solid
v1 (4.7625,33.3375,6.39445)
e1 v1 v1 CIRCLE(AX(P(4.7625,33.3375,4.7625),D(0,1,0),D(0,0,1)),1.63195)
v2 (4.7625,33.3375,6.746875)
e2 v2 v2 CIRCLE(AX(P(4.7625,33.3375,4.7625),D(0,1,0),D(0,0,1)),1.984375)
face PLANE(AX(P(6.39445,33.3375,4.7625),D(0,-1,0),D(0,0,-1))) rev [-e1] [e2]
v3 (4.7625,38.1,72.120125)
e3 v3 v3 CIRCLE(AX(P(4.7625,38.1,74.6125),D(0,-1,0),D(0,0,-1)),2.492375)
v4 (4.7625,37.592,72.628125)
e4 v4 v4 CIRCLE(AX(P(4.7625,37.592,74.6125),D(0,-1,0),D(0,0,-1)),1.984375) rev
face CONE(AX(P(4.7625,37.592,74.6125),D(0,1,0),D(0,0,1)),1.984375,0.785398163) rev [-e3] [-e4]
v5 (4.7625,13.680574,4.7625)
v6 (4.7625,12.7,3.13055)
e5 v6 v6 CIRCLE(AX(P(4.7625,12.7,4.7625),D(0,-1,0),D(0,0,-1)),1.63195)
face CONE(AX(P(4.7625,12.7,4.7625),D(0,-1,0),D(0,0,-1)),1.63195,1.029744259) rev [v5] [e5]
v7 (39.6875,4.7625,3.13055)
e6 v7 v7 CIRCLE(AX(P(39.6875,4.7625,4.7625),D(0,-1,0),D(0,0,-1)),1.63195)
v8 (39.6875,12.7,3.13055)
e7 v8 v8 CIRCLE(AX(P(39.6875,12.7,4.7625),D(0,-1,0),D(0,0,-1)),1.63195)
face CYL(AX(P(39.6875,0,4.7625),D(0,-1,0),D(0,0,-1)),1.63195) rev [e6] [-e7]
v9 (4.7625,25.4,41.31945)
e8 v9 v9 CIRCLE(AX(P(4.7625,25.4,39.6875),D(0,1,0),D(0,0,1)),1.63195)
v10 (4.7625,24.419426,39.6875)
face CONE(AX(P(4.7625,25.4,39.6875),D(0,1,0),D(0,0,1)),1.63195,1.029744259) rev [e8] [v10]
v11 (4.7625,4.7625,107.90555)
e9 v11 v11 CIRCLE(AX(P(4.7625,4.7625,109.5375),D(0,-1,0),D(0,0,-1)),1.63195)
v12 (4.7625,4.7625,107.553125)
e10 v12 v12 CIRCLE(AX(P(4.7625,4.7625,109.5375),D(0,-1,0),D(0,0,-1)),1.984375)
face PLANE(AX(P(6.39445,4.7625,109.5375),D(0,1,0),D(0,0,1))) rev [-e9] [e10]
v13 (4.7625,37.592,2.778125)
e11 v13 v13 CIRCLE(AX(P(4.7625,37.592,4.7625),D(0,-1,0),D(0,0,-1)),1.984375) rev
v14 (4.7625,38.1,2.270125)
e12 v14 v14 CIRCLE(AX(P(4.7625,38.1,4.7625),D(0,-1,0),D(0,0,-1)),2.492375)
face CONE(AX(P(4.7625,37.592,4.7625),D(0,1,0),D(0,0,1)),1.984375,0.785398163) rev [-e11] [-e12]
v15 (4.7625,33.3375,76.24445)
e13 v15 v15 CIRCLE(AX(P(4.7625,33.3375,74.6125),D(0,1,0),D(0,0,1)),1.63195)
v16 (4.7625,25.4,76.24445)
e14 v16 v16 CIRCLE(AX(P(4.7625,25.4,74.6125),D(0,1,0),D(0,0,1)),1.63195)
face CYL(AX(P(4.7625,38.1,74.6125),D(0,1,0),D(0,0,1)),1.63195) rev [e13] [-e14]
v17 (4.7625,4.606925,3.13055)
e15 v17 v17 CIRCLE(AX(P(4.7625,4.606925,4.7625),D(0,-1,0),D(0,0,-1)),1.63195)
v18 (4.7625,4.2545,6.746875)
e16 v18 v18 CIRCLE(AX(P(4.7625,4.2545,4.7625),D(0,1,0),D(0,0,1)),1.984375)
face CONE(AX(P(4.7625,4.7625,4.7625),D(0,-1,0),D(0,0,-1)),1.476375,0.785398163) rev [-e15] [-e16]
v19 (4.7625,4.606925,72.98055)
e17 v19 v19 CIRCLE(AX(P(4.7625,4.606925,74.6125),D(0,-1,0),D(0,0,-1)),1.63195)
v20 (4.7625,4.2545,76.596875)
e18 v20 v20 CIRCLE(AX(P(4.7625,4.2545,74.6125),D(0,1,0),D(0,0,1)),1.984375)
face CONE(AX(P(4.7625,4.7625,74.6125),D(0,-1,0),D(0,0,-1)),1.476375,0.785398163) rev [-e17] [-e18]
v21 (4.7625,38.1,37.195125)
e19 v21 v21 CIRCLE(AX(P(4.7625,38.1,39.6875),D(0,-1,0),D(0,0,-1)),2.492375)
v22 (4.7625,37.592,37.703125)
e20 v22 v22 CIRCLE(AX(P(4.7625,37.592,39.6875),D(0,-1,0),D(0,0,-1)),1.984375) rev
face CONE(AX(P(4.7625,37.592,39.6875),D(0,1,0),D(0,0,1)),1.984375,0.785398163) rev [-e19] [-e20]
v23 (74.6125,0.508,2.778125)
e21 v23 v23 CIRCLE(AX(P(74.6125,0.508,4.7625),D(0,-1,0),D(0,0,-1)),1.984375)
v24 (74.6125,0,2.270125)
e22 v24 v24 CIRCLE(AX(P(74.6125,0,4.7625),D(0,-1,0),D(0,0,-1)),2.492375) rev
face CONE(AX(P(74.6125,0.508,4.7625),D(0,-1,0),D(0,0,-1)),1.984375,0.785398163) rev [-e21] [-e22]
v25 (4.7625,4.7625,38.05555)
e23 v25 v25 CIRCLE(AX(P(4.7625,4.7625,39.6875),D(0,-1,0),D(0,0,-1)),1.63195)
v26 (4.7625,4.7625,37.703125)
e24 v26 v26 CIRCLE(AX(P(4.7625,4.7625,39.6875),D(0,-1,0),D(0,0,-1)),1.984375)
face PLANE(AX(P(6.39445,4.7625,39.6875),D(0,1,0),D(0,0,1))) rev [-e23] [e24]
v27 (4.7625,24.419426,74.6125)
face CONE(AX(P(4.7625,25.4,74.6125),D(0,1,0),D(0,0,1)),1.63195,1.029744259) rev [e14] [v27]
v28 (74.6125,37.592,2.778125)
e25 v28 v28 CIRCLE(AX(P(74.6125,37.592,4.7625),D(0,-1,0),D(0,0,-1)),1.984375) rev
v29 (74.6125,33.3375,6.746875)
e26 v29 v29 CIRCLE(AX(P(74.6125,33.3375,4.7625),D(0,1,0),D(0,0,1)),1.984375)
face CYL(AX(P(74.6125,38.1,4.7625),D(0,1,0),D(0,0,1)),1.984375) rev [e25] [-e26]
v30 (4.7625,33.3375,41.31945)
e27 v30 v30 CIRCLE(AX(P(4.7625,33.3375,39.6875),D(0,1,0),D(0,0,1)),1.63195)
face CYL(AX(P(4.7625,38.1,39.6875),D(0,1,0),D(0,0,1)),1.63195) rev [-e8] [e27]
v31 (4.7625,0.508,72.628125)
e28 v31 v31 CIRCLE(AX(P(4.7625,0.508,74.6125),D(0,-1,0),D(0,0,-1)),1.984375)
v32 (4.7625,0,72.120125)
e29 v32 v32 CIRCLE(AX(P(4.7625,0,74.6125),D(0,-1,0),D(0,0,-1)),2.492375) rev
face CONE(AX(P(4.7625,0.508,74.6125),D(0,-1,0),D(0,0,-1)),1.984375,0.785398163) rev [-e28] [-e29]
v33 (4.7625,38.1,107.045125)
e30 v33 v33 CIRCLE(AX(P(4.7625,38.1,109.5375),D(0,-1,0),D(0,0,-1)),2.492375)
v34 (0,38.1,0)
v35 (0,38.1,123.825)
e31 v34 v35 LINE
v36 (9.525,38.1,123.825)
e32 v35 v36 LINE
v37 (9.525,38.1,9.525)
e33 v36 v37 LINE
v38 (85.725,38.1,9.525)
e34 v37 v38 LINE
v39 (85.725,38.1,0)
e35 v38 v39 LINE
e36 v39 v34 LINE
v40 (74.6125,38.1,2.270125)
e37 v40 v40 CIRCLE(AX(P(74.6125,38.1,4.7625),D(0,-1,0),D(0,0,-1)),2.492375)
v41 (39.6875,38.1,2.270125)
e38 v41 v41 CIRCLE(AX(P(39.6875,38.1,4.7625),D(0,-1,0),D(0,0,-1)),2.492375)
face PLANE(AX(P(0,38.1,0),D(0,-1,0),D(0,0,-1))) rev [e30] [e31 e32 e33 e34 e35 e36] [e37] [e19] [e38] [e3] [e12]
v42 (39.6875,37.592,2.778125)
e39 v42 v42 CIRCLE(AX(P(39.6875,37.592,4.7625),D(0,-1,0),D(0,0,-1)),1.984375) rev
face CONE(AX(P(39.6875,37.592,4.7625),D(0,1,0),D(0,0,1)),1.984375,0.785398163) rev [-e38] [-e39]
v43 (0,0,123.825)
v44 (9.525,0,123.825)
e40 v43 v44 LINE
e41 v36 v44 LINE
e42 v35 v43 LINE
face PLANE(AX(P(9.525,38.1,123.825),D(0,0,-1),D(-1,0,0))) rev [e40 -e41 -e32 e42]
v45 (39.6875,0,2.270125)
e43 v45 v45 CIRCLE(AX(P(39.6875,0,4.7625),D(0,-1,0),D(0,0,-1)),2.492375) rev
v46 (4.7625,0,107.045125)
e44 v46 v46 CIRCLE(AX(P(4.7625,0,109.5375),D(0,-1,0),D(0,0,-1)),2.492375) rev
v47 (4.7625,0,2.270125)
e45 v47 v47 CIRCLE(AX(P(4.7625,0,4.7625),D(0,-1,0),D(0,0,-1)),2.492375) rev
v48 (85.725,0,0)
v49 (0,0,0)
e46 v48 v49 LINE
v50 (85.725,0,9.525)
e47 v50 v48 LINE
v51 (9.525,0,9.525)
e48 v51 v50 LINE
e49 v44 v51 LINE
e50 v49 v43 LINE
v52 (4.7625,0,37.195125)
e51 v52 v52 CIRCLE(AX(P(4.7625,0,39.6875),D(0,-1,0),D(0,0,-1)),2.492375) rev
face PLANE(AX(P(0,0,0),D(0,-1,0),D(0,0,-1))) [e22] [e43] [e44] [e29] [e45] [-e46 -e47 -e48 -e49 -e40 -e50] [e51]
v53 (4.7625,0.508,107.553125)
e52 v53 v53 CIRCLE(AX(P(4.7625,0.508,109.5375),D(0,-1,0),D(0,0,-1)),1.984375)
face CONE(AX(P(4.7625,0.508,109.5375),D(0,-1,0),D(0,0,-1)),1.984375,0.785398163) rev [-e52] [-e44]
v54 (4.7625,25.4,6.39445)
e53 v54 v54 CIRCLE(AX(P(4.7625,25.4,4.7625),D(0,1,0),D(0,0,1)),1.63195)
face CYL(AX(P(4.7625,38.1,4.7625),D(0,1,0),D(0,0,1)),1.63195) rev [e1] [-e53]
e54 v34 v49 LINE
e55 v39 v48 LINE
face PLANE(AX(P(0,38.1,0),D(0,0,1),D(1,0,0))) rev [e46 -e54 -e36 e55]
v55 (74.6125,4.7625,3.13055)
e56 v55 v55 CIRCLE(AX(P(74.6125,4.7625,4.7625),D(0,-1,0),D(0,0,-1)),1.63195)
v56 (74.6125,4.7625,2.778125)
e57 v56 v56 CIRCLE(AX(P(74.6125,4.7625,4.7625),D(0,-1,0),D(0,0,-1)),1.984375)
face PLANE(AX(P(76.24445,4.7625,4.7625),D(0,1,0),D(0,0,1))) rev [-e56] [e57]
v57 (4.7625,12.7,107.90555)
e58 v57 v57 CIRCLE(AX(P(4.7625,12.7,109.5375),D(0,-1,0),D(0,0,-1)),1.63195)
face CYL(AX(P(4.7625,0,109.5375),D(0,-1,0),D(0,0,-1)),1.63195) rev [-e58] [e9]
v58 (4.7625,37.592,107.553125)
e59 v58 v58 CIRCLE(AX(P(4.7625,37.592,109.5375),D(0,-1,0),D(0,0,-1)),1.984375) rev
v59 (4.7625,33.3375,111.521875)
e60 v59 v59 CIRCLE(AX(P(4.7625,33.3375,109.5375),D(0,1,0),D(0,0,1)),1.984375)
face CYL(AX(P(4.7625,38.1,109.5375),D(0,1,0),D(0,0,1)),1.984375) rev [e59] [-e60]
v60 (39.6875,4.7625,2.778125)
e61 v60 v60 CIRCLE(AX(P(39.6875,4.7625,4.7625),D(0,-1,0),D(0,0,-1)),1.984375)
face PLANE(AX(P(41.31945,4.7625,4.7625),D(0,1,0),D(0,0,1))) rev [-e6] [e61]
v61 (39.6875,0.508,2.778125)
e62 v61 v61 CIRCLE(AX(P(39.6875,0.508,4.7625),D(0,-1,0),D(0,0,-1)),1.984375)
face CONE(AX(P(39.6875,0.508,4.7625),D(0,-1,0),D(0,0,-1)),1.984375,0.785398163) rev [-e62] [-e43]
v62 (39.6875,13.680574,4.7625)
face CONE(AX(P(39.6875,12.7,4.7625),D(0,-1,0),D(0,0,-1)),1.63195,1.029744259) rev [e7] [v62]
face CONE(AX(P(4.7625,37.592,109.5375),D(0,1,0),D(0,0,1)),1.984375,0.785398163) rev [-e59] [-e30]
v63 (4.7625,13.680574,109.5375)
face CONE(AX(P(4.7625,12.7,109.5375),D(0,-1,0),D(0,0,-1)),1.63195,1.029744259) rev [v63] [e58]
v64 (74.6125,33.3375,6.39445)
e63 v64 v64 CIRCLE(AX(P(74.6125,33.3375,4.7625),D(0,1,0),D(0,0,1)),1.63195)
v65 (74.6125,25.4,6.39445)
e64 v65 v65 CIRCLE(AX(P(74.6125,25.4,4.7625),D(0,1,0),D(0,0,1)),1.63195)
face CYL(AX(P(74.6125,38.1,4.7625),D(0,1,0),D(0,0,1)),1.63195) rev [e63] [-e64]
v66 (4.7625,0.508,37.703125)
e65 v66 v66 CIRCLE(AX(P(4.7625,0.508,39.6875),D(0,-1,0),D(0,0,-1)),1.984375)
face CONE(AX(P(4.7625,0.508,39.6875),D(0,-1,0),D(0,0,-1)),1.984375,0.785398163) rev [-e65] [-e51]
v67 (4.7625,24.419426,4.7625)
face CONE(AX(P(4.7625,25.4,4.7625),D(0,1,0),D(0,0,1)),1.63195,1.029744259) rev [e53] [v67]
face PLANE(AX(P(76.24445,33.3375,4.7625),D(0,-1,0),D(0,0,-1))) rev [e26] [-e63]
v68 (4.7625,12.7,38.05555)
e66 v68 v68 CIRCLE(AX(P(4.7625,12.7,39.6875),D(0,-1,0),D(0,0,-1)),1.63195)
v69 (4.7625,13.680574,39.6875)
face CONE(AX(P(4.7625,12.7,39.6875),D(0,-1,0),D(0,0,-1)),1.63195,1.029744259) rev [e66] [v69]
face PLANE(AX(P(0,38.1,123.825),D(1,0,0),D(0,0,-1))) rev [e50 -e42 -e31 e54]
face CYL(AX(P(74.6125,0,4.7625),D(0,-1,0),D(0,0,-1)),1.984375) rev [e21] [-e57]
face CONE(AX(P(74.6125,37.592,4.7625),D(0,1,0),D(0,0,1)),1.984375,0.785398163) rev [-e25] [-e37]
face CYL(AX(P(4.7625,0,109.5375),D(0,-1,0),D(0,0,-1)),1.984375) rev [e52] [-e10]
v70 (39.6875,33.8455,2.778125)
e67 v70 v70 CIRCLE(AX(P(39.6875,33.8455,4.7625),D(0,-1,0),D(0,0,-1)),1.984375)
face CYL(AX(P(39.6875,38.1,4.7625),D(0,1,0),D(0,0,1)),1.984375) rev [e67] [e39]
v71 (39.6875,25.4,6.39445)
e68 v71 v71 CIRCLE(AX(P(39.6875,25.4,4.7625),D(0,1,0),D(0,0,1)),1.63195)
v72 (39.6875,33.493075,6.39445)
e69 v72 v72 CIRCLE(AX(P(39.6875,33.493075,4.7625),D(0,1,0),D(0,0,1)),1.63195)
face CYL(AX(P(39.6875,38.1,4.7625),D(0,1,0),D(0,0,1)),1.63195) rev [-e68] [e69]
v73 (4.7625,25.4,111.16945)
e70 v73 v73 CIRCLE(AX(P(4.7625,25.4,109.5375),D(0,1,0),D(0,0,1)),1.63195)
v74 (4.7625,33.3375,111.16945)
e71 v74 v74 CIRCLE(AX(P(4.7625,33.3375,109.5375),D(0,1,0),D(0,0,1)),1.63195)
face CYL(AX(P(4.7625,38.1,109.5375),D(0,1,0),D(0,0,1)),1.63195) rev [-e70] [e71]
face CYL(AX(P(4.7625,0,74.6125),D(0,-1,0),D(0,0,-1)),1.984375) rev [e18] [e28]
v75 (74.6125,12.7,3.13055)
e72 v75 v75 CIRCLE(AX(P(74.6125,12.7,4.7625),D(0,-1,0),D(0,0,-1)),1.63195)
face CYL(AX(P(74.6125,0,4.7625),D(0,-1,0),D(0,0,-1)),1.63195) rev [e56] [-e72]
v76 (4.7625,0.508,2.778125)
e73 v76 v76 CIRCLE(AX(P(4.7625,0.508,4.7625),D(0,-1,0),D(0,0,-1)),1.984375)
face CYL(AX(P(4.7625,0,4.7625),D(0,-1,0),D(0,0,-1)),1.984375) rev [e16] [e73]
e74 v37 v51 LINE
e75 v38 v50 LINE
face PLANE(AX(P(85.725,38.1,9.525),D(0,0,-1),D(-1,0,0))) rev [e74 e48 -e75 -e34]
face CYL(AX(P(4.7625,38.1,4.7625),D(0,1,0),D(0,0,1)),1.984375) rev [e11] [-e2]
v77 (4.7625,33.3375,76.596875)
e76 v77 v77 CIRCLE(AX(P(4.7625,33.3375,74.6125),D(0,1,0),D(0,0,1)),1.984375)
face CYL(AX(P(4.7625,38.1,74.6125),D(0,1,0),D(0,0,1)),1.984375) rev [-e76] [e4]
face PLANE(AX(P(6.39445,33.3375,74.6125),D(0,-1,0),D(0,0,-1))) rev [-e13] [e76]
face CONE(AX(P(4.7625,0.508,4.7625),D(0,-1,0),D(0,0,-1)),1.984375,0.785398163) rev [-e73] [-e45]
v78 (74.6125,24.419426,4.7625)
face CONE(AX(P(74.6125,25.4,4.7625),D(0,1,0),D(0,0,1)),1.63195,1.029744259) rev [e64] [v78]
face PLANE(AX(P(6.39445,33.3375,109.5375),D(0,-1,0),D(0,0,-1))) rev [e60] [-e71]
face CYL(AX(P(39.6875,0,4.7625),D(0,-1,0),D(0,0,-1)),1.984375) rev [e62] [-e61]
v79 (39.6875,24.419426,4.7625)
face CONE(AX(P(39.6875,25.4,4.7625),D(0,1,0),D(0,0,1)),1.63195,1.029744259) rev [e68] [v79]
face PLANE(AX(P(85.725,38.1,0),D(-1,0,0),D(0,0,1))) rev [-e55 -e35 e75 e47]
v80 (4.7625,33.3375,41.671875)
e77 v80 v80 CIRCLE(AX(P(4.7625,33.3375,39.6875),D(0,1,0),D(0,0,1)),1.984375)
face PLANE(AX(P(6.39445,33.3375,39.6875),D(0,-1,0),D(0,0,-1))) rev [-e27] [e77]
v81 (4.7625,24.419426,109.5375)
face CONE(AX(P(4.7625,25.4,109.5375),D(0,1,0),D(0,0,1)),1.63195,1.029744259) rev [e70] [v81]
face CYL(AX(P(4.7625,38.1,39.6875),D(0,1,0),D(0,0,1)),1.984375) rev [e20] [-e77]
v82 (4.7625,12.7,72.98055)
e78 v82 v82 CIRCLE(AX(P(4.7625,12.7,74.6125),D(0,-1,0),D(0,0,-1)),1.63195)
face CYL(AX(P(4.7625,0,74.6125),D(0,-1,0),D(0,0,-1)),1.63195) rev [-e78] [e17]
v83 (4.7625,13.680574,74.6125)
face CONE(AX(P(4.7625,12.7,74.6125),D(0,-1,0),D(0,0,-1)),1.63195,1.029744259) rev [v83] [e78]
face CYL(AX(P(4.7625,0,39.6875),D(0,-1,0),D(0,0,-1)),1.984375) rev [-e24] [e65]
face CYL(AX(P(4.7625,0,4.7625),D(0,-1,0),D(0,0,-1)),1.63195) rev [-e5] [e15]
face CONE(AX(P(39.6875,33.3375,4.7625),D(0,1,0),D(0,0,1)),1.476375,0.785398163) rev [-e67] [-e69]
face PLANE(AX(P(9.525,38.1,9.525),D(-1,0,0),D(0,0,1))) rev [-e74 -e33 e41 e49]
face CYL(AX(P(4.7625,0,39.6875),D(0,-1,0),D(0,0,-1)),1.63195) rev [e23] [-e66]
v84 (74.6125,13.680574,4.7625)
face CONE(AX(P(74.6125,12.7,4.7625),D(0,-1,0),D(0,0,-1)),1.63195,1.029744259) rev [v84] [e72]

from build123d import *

# Parameters (mm, degrees)
BOSS_EXTRUDE1_DEPTH                           = 38.1
CBORE_FOR_4_SOCKET_HEAD_CAP_SCREW1_AT_2_COUNT = 2
CBORE_FOR_4_SOCKET_HEAD_CAP_SCREW1_AT_2_PITCH = 34.925
CBORE_FOR_4_SOCKET_HEAD_CAP_SCREW1_AT_3_COUNT = 2
CBORE_FOR_4_SOCKET_HEAD_CAP_SCREW1_AT_3_PITCH = 69.85
CBORE_FOR_4_SOCKET_HEAD_CAP_SCREW1_AT_4_COUNT = 2
CBORE_FOR_4_SOCKET_HEAD_CAP_SCREW1_AT_4_PITCH = 34.925
CBORE_FOR_4_SOCKET_HEAD_CAP_SCREW1_AT_5_COUNT = 2
CBORE_FOR_4_SOCKET_HEAD_CAP_SCREW1_AT_5_PITCH = 69.85
CBORE_FOR_4_SOCKET_HEAD_CAP_SCREW1_AT_6_COUNT = 2
CBORE_FOR_4_SOCKET_HEAD_CAP_SCREW1_AT_6_PITCH = 104.775
CHAMFER1_SIZE                                 = 0.508


with BuildPart() as part:
    # Sketch1 → Boss-Extrude1 (new body)
    with BuildSketch(Plane(origin=(0, 0, 0), x_dir=(1, 0, 0), z_dir=(0, 1, 0))):
        Polygon((0, 0), (85.725, 0), (85.725, -9.525), (9.525, -9.525), (9.525, -123.825), (0, -123.825), align=None)
    extrude(amount=BOSS_EXTRUDE1_DEPTH)

    # Sketch2 → CBORE for #4 Socket Head Cap Screw1 (revolve, cut)
    with BuildSketch(Plane(origin=(4.7625, 0, 4.7625), x_dir=(0, 0, -1), z_dir=(1, 0, 0))):
        Polygon((0, 0), (0, 13.680574487), (1.63195, 12.7), (1.63195, 4.7625), (1.984375, 4.7625), (1.984375, 0), align=None)
    cbore_for_4_socket_head_cap_screw1 = revolve(axis=Axis((4.7625, -6.35, 4.7625), (0, 1, 0)), mode=Mode.SUBTRACT)

    # CBORE for #4 Socket Head Cap Screw1 at 2: CBORE for #4 Socket Head Cap Screw1 ×2
    with Locations(*[(0, 0, i * CBORE_FOR_4_SOCKET_HEAD_CAP_SCREW1_AT_2_PITCH) for i in range(1, CBORE_FOR_4_SOCKET_HEAD_CAP_SCREW1_AT_2_COUNT)]):
        add(cbore_for_4_socket_head_cap_screw1, mode=Mode.SUBTRACT)

    # CBORE for #4 Socket Head Cap Screw1 at 3: CBORE for #4 Socket Head Cap Screw1 ×2
    with Locations(*[(0, 0, i * CBORE_FOR_4_SOCKET_HEAD_CAP_SCREW1_AT_3_PITCH) for i in range(1, CBORE_FOR_4_SOCKET_HEAD_CAP_SCREW1_AT_3_COUNT)]):
        add(cbore_for_4_socket_head_cap_screw1, mode=Mode.SUBTRACT)

    # CBORE for #4 Socket Head Cap Screw1 at 4: CBORE for #4 Socket Head Cap Screw1 ×2
    with Locations(*[(i * CBORE_FOR_4_SOCKET_HEAD_CAP_SCREW1_AT_4_PITCH, 0, 0) for i in range(1, CBORE_FOR_4_SOCKET_HEAD_CAP_SCREW1_AT_4_COUNT)]):
        add(cbore_for_4_socket_head_cap_screw1, mode=Mode.SUBTRACT)

    # CBORE for #4 Socket Head Cap Screw1 at 5: CBORE for #4 Socket Head Cap Screw1 ×2
    with Locations(*[(i * CBORE_FOR_4_SOCKET_HEAD_CAP_SCREW1_AT_5_PITCH, 0, 0) for i in range(1, CBORE_FOR_4_SOCKET_HEAD_CAP_SCREW1_AT_5_COUNT)]):
        add(cbore_for_4_socket_head_cap_screw1, mode=Mode.SUBTRACT)

    # CBORE for #4 Socket Head Cap Screw1 at 6: CBORE for #4 Socket Head Cap Screw1 ×2
    with Locations(*[(0, 0, i * CBORE_FOR_4_SOCKET_HEAD_CAP_SCREW1_AT_6_PITCH) for i in range(1, CBORE_FOR_4_SOCKET_HEAD_CAP_SCREW1_AT_6_COUNT)]):
        add(cbore_for_4_socket_head_cap_screw1, mode=Mode.SUBTRACT)

    # Mirror CBORE for #4 Socket Head Cap Screw: CBORE for #4 Socket Head Cap Screw1 across plane
    add(cbore_for_4_socket_head_cap_screw1.mirror(Plane.ZX.offset(19.05)), mode=Mode.SUBTRACT)

    # Mirror CBORE for _4 Socket Head Cap  2 → Mirror CBORE for _4 Socket Head Cap  3 (revolve, cut)
    with BuildSketch(Plane(origin=(4.7625, 38.1, 39.6875), x_dir=(0, 0, -1), z_dir=(1, 0, 0))):
        Polygon((0, 0), (0, -13.680574487), (1.63195, -12.7), (1.63195, -4.7625), (1.984375, -4.7625), (1.984375, 0), align=None)
    revolve(axis=Axis((4.7625, 44.45, 39.6875), (0, 1, 0)), mode=Mode.SUBTRACT)

    # Mirror CBORE for _4 Socket Head Cap  4 → Mirror CBORE for _4 Socket Head Cap  5 (revolve, cut)
    with BuildSketch(Plane(origin=(4.7625, 38.1, 74.6125), x_dir=(0, 0, -1), z_dir=(1, 0, 0))):
        Polygon((0, 0), (0, -13.680574487), (1.63195, -12.7), (1.63195, -4.7625), (1.984375, -4.7625), (1.984375, 0), align=None)
    revolve(axis=Axis((4.7625, 44.45, 74.6125), (0, 1, 0)), mode=Mode.SUBTRACT)

    # Mirror CBORE for _4 Socket Head Cap  6 → Mirror CBORE for _4 Socket Head Cap  7 (revolve, cut)
    with BuildSketch(Plane(origin=(39.6875, 38.1, 4.7625), x_dir=(0, 0, -1), z_dir=(1, 0, 0))):
        Polygon((0, 0), (0, -13.680574487), (1.63195, -12.7), (1.63195, -4.7625), (1.984375, -4.7625), (1.984375, 0), align=None)
    revolve(axis=Axis((39.6875, 44.45, 4.7625), (0, 1, 0)), mode=Mode.SUBTRACT)

    # Mirror CBORE for _4 Socket Head Cap  8 → Mirror CBORE for _4 Socket Head Cap  9 (revolve, cut)
    with BuildSketch(Plane(origin=(74.6125, 38.1, 4.7625), x_dir=(0, 0, -1), z_dir=(1, 0, 0))):
        Polygon((0, 0), (0, -13.680574487), (1.63195, -12.7), (1.63195, -4.7625), (1.984375, -4.7625), (1.984375, 0), align=None)
    revolve(axis=Axis((74.6125, 44.45, 4.7625), (0, 1, 0)), mode=Mode.SUBTRACT)

    # Mirror CBORE for _4 Socket Head Cap  10 → Mirror CBORE for _4 Socket Head Cap  11 (revolve, cut)
    with BuildSketch(Plane(origin=(4.7625, 38.1, 109.5375), x_dir=(0, 0, -1), z_dir=(1, 0, 0))):
        Polygon((0, 0), (0, -13.680574487), (1.63195, -12.7), (1.63195, -4.7625), (1.984375, -4.7625), (1.984375, 0), align=None)
    revolve(axis=Axis((4.7625, 44.45, 109.5375), (0, 1, 0)), mode=Mode.SUBTRACT)

    # Chamfer1
    # the kernel refuses this chamfer: 0.508 mm, written as the material it adds along each edge
    with BuildSketch(Plane(origin=(4.7625, 4.7625, 4.7625), x_dir=(0, 0, -1), z_dir=(1, 0, 0))) as chamfer1_piece_1_section:
        Polygon((1.984375, -CHAMFER1_SIZE), (1.984375 - CHAMFER1_SIZE, 0), (1.984375, 0), align=None)
    chamfer1_piece_1 = revolve(axis=Axis((4.7625, 4.7625, 4.7625), (0, 1, 0)), mode=Mode.PRIVATE)
    chamfer1_piece_1 = chamfer1_piece_1 - Plane(origin=(4.7625, 4.431570678, 4.7625), x_dir=(0, 0, -1), z_dir=(0, -1, 0)) * Cylinder(1.63195, 8, mode=Mode.PRIVATE)
    add(chamfer1_piece_1)
    with BuildSketch(Plane(origin=(4.7625, 4.7625, 74.6125), x_dir=(0, 0, -1), z_dir=(1, 0, 0))) as chamfer1_piece_2_section:
        Polygon((1.984375, -CHAMFER1_SIZE), (1.984375 - CHAMFER1_SIZE, 0), (1.984375, 0), align=None)
    chamfer1_piece_2 = revolve(axis=Axis((4.7625, 4.7625, 74.6125), (0, 1, 0)), mode=Mode.PRIVATE)
    chamfer1_piece_2 = chamfer1_piece_2 - Plane(origin=(4.7625, 4.431570678, 74.6125), x_dir=(0, 0, -1), z_dir=(0, -1, 0)) * Cylinder(1.63195, 8, mode=Mode.PRIVATE)
    add(chamfer1_piece_2)
    with BuildSketch(Plane(origin=(39.6875, 33.3375, 4.7625), x_dir=(0, 0, -1), z_dir=(1, 0, 0))) as chamfer1_piece_3_section:
        Polygon((1.984375, CHAMFER1_SIZE), (1.984375 - CHAMFER1_SIZE, 0), (1.984375, 0), align=None)
    chamfer1_piece_3 = revolve(axis=Axis((39.6875, 33.3375, 4.7625), (0, 1, 0)), mode=Mode.PRIVATE)
    chamfer1_piece_3 = chamfer1_piece_3 - Plane(origin=(39.6875, 33.668429322, 4.7625), x_dir=(0, 0, -1), z_dir=(0, 1, 0)) * Cylinder(1.63195, 8, mode=Mode.PRIVATE)
    add(chamfer1_piece_3)
    # the kernel refuses this chamfer: 0.508 mm, written as the material it takes off along each edge
    with BuildSketch(Plane(origin=(4.7625, 0, 4.7625), x_dir=(0, 0, -1), z_dir=(1, 0, 0))) as chamfer1_2_piece_1:
        Polygon((1.984375 + CHAMFER1_SIZE, 0), (1.984375, CHAMFER1_SIZE), (1.984375, 0), align=None)
    revolve(axis=Axis((4.7625, 0, 4.7625), (0, 1, 0)), mode=Mode.SUBTRACT)
    with BuildSketch(Plane(origin=(4.7625, 0, 74.6125), x_dir=(0, 0, -1), z_dir=(1, 0, 0))) as chamfer1_2_piece_2:
        Polygon((1.984375 + CHAMFER1_SIZE, 0), (1.984375, CHAMFER1_SIZE), (1.984375, 0), align=None)
    revolve(axis=Axis((4.7625, 0, 74.6125), (0, 1, 0)), mode=Mode.SUBTRACT)
    with BuildSketch(Plane(origin=(74.6125, 0, 4.7625), x_dir=(0, 0, -1), z_dir=(1, 0, 0))) as chamfer1_2_piece_3:
        Polygon((1.984375 + CHAMFER1_SIZE, 0), (1.984375, CHAMFER1_SIZE), (1.984375, 0), align=None)
    revolve(axis=Axis((74.6125, 0, 4.7625), (0, 1, 0)), mode=Mode.SUBTRACT)
    with BuildSketch(Plane(origin=(39.6875, 0, 4.7625), x_dir=(0, 0, -1), z_dir=(1, 0, 0))) as chamfer1_2_piece_4:
        Polygon((1.984375 + CHAMFER1_SIZE, 0), (1.984375, CHAMFER1_SIZE), (1.984375, 0), align=None)
    revolve(axis=Axis((39.6875, 0, 4.7625), (0, 1, 0)), mode=Mode.SUBTRACT)
    with BuildSketch(Plane(origin=(4.7625, 0, 39.6875), x_dir=(0, 0, -1), z_dir=(1, 0, 0))) as chamfer1_2_piece_5:
        Polygon((1.984375 + CHAMFER1_SIZE, 0), (1.984375, CHAMFER1_SIZE), (1.984375, 0), align=None)
    revolve(axis=Axis((4.7625, 0, 39.6875), (0, 1, 0)), mode=Mode.SUBTRACT)
    with BuildSketch(Plane(origin=(4.7625, 0, 109.5375), x_dir=(0, 0, -1), z_dir=(1, 0, 0))) as chamfer1_2_piece_6:
        Polygon((1.984375 + CHAMFER1_SIZE, 0), (1.984375, CHAMFER1_SIZE), (1.984375, 0), align=None)
    revolve(axis=Axis((4.7625, 0, 109.5375), (0, 1, 0)), mode=Mode.SUBTRACT)
    with BuildSketch(Plane(origin=(39.6875, 38.1, 4.7625), x_dir=(0, 0, -1), z_dir=(1, 0, 0))) as chamfer1_2_piece_7:
        Polygon((1.984375 + CHAMFER1_SIZE, 0), (1.984375, -CHAMFER1_SIZE), (1.984375, 0), align=None)
    revolve(axis=Axis((39.6875, 38.1, 4.7625), (0, 1, 0)), mode=Mode.SUBTRACT)
    with BuildSketch(Plane(origin=(74.6125, 38.1, 4.7625), x_dir=(0, 0, -1), z_dir=(1, 0, 0))) as chamfer1_2_piece_8:
        Polygon((1.984375 + CHAMFER1_SIZE, 0), (1.984375, -CHAMFER1_SIZE), (1.984375, 0), align=None)
    revolve(axis=Axis((74.6125, 38.1, 4.7625), (0, 1, 0)), mode=Mode.SUBTRACT)
    with BuildSketch(Plane(origin=(4.7625, 38.1, 4.7625), x_dir=(0, 0, -1), z_dir=(1, 0, 0))) as chamfer1_2_piece_9:
        Polygon((1.984375 + CHAMFER1_SIZE, 0), (1.984375, -CHAMFER1_SIZE), (1.984375, 0), align=None)
    revolve(axis=Axis((4.7625, 38.1, 4.7625), (0, 1, 0)), mode=Mode.SUBTRACT)
    with BuildSketch(Plane(origin=(4.7625, 38.1, 39.6875), x_dir=(0, 0, -1), z_dir=(1, 0, 0))) as chamfer1_2_piece_10:
        Polygon((1.984375 + CHAMFER1_SIZE, 0), (1.984375, -CHAMFER1_SIZE), (1.984375, 0), align=None)
    revolve(axis=Axis((4.7625, 38.1, 39.6875), (0, 1, 0)), mode=Mode.SUBTRACT)
    with BuildSketch(Plane(origin=(4.7625, 38.1, 74.6125), x_dir=(0, 0, -1), z_dir=(1, 0, 0))) as chamfer1_2_piece_11:
        Polygon((1.984375 + CHAMFER1_SIZE, 0), (1.984375, -CHAMFER1_SIZE), (1.984375, 0), align=None)
    revolve(axis=Axis((4.7625, 38.1, 74.6125), (0, 1, 0)), mode=Mode.SUBTRACT)
    with BuildSketch(Plane(origin=(4.7625, 38.1, 109.5375), x_dir=(0, 0, -1), z_dir=(1, 0, 0))) as chamfer1_2_piece_12:
        Polygon((1.984375 + CHAMFER1_SIZE, 0), (1.984375, -CHAMFER1_SIZE), (1.984375, 0), align=None)
    revolve(axis=Axis((4.7625, 38.1, 109.5375), (0, 1, 0)), mode=Mode.SUBTRACT)


solid = part.part
